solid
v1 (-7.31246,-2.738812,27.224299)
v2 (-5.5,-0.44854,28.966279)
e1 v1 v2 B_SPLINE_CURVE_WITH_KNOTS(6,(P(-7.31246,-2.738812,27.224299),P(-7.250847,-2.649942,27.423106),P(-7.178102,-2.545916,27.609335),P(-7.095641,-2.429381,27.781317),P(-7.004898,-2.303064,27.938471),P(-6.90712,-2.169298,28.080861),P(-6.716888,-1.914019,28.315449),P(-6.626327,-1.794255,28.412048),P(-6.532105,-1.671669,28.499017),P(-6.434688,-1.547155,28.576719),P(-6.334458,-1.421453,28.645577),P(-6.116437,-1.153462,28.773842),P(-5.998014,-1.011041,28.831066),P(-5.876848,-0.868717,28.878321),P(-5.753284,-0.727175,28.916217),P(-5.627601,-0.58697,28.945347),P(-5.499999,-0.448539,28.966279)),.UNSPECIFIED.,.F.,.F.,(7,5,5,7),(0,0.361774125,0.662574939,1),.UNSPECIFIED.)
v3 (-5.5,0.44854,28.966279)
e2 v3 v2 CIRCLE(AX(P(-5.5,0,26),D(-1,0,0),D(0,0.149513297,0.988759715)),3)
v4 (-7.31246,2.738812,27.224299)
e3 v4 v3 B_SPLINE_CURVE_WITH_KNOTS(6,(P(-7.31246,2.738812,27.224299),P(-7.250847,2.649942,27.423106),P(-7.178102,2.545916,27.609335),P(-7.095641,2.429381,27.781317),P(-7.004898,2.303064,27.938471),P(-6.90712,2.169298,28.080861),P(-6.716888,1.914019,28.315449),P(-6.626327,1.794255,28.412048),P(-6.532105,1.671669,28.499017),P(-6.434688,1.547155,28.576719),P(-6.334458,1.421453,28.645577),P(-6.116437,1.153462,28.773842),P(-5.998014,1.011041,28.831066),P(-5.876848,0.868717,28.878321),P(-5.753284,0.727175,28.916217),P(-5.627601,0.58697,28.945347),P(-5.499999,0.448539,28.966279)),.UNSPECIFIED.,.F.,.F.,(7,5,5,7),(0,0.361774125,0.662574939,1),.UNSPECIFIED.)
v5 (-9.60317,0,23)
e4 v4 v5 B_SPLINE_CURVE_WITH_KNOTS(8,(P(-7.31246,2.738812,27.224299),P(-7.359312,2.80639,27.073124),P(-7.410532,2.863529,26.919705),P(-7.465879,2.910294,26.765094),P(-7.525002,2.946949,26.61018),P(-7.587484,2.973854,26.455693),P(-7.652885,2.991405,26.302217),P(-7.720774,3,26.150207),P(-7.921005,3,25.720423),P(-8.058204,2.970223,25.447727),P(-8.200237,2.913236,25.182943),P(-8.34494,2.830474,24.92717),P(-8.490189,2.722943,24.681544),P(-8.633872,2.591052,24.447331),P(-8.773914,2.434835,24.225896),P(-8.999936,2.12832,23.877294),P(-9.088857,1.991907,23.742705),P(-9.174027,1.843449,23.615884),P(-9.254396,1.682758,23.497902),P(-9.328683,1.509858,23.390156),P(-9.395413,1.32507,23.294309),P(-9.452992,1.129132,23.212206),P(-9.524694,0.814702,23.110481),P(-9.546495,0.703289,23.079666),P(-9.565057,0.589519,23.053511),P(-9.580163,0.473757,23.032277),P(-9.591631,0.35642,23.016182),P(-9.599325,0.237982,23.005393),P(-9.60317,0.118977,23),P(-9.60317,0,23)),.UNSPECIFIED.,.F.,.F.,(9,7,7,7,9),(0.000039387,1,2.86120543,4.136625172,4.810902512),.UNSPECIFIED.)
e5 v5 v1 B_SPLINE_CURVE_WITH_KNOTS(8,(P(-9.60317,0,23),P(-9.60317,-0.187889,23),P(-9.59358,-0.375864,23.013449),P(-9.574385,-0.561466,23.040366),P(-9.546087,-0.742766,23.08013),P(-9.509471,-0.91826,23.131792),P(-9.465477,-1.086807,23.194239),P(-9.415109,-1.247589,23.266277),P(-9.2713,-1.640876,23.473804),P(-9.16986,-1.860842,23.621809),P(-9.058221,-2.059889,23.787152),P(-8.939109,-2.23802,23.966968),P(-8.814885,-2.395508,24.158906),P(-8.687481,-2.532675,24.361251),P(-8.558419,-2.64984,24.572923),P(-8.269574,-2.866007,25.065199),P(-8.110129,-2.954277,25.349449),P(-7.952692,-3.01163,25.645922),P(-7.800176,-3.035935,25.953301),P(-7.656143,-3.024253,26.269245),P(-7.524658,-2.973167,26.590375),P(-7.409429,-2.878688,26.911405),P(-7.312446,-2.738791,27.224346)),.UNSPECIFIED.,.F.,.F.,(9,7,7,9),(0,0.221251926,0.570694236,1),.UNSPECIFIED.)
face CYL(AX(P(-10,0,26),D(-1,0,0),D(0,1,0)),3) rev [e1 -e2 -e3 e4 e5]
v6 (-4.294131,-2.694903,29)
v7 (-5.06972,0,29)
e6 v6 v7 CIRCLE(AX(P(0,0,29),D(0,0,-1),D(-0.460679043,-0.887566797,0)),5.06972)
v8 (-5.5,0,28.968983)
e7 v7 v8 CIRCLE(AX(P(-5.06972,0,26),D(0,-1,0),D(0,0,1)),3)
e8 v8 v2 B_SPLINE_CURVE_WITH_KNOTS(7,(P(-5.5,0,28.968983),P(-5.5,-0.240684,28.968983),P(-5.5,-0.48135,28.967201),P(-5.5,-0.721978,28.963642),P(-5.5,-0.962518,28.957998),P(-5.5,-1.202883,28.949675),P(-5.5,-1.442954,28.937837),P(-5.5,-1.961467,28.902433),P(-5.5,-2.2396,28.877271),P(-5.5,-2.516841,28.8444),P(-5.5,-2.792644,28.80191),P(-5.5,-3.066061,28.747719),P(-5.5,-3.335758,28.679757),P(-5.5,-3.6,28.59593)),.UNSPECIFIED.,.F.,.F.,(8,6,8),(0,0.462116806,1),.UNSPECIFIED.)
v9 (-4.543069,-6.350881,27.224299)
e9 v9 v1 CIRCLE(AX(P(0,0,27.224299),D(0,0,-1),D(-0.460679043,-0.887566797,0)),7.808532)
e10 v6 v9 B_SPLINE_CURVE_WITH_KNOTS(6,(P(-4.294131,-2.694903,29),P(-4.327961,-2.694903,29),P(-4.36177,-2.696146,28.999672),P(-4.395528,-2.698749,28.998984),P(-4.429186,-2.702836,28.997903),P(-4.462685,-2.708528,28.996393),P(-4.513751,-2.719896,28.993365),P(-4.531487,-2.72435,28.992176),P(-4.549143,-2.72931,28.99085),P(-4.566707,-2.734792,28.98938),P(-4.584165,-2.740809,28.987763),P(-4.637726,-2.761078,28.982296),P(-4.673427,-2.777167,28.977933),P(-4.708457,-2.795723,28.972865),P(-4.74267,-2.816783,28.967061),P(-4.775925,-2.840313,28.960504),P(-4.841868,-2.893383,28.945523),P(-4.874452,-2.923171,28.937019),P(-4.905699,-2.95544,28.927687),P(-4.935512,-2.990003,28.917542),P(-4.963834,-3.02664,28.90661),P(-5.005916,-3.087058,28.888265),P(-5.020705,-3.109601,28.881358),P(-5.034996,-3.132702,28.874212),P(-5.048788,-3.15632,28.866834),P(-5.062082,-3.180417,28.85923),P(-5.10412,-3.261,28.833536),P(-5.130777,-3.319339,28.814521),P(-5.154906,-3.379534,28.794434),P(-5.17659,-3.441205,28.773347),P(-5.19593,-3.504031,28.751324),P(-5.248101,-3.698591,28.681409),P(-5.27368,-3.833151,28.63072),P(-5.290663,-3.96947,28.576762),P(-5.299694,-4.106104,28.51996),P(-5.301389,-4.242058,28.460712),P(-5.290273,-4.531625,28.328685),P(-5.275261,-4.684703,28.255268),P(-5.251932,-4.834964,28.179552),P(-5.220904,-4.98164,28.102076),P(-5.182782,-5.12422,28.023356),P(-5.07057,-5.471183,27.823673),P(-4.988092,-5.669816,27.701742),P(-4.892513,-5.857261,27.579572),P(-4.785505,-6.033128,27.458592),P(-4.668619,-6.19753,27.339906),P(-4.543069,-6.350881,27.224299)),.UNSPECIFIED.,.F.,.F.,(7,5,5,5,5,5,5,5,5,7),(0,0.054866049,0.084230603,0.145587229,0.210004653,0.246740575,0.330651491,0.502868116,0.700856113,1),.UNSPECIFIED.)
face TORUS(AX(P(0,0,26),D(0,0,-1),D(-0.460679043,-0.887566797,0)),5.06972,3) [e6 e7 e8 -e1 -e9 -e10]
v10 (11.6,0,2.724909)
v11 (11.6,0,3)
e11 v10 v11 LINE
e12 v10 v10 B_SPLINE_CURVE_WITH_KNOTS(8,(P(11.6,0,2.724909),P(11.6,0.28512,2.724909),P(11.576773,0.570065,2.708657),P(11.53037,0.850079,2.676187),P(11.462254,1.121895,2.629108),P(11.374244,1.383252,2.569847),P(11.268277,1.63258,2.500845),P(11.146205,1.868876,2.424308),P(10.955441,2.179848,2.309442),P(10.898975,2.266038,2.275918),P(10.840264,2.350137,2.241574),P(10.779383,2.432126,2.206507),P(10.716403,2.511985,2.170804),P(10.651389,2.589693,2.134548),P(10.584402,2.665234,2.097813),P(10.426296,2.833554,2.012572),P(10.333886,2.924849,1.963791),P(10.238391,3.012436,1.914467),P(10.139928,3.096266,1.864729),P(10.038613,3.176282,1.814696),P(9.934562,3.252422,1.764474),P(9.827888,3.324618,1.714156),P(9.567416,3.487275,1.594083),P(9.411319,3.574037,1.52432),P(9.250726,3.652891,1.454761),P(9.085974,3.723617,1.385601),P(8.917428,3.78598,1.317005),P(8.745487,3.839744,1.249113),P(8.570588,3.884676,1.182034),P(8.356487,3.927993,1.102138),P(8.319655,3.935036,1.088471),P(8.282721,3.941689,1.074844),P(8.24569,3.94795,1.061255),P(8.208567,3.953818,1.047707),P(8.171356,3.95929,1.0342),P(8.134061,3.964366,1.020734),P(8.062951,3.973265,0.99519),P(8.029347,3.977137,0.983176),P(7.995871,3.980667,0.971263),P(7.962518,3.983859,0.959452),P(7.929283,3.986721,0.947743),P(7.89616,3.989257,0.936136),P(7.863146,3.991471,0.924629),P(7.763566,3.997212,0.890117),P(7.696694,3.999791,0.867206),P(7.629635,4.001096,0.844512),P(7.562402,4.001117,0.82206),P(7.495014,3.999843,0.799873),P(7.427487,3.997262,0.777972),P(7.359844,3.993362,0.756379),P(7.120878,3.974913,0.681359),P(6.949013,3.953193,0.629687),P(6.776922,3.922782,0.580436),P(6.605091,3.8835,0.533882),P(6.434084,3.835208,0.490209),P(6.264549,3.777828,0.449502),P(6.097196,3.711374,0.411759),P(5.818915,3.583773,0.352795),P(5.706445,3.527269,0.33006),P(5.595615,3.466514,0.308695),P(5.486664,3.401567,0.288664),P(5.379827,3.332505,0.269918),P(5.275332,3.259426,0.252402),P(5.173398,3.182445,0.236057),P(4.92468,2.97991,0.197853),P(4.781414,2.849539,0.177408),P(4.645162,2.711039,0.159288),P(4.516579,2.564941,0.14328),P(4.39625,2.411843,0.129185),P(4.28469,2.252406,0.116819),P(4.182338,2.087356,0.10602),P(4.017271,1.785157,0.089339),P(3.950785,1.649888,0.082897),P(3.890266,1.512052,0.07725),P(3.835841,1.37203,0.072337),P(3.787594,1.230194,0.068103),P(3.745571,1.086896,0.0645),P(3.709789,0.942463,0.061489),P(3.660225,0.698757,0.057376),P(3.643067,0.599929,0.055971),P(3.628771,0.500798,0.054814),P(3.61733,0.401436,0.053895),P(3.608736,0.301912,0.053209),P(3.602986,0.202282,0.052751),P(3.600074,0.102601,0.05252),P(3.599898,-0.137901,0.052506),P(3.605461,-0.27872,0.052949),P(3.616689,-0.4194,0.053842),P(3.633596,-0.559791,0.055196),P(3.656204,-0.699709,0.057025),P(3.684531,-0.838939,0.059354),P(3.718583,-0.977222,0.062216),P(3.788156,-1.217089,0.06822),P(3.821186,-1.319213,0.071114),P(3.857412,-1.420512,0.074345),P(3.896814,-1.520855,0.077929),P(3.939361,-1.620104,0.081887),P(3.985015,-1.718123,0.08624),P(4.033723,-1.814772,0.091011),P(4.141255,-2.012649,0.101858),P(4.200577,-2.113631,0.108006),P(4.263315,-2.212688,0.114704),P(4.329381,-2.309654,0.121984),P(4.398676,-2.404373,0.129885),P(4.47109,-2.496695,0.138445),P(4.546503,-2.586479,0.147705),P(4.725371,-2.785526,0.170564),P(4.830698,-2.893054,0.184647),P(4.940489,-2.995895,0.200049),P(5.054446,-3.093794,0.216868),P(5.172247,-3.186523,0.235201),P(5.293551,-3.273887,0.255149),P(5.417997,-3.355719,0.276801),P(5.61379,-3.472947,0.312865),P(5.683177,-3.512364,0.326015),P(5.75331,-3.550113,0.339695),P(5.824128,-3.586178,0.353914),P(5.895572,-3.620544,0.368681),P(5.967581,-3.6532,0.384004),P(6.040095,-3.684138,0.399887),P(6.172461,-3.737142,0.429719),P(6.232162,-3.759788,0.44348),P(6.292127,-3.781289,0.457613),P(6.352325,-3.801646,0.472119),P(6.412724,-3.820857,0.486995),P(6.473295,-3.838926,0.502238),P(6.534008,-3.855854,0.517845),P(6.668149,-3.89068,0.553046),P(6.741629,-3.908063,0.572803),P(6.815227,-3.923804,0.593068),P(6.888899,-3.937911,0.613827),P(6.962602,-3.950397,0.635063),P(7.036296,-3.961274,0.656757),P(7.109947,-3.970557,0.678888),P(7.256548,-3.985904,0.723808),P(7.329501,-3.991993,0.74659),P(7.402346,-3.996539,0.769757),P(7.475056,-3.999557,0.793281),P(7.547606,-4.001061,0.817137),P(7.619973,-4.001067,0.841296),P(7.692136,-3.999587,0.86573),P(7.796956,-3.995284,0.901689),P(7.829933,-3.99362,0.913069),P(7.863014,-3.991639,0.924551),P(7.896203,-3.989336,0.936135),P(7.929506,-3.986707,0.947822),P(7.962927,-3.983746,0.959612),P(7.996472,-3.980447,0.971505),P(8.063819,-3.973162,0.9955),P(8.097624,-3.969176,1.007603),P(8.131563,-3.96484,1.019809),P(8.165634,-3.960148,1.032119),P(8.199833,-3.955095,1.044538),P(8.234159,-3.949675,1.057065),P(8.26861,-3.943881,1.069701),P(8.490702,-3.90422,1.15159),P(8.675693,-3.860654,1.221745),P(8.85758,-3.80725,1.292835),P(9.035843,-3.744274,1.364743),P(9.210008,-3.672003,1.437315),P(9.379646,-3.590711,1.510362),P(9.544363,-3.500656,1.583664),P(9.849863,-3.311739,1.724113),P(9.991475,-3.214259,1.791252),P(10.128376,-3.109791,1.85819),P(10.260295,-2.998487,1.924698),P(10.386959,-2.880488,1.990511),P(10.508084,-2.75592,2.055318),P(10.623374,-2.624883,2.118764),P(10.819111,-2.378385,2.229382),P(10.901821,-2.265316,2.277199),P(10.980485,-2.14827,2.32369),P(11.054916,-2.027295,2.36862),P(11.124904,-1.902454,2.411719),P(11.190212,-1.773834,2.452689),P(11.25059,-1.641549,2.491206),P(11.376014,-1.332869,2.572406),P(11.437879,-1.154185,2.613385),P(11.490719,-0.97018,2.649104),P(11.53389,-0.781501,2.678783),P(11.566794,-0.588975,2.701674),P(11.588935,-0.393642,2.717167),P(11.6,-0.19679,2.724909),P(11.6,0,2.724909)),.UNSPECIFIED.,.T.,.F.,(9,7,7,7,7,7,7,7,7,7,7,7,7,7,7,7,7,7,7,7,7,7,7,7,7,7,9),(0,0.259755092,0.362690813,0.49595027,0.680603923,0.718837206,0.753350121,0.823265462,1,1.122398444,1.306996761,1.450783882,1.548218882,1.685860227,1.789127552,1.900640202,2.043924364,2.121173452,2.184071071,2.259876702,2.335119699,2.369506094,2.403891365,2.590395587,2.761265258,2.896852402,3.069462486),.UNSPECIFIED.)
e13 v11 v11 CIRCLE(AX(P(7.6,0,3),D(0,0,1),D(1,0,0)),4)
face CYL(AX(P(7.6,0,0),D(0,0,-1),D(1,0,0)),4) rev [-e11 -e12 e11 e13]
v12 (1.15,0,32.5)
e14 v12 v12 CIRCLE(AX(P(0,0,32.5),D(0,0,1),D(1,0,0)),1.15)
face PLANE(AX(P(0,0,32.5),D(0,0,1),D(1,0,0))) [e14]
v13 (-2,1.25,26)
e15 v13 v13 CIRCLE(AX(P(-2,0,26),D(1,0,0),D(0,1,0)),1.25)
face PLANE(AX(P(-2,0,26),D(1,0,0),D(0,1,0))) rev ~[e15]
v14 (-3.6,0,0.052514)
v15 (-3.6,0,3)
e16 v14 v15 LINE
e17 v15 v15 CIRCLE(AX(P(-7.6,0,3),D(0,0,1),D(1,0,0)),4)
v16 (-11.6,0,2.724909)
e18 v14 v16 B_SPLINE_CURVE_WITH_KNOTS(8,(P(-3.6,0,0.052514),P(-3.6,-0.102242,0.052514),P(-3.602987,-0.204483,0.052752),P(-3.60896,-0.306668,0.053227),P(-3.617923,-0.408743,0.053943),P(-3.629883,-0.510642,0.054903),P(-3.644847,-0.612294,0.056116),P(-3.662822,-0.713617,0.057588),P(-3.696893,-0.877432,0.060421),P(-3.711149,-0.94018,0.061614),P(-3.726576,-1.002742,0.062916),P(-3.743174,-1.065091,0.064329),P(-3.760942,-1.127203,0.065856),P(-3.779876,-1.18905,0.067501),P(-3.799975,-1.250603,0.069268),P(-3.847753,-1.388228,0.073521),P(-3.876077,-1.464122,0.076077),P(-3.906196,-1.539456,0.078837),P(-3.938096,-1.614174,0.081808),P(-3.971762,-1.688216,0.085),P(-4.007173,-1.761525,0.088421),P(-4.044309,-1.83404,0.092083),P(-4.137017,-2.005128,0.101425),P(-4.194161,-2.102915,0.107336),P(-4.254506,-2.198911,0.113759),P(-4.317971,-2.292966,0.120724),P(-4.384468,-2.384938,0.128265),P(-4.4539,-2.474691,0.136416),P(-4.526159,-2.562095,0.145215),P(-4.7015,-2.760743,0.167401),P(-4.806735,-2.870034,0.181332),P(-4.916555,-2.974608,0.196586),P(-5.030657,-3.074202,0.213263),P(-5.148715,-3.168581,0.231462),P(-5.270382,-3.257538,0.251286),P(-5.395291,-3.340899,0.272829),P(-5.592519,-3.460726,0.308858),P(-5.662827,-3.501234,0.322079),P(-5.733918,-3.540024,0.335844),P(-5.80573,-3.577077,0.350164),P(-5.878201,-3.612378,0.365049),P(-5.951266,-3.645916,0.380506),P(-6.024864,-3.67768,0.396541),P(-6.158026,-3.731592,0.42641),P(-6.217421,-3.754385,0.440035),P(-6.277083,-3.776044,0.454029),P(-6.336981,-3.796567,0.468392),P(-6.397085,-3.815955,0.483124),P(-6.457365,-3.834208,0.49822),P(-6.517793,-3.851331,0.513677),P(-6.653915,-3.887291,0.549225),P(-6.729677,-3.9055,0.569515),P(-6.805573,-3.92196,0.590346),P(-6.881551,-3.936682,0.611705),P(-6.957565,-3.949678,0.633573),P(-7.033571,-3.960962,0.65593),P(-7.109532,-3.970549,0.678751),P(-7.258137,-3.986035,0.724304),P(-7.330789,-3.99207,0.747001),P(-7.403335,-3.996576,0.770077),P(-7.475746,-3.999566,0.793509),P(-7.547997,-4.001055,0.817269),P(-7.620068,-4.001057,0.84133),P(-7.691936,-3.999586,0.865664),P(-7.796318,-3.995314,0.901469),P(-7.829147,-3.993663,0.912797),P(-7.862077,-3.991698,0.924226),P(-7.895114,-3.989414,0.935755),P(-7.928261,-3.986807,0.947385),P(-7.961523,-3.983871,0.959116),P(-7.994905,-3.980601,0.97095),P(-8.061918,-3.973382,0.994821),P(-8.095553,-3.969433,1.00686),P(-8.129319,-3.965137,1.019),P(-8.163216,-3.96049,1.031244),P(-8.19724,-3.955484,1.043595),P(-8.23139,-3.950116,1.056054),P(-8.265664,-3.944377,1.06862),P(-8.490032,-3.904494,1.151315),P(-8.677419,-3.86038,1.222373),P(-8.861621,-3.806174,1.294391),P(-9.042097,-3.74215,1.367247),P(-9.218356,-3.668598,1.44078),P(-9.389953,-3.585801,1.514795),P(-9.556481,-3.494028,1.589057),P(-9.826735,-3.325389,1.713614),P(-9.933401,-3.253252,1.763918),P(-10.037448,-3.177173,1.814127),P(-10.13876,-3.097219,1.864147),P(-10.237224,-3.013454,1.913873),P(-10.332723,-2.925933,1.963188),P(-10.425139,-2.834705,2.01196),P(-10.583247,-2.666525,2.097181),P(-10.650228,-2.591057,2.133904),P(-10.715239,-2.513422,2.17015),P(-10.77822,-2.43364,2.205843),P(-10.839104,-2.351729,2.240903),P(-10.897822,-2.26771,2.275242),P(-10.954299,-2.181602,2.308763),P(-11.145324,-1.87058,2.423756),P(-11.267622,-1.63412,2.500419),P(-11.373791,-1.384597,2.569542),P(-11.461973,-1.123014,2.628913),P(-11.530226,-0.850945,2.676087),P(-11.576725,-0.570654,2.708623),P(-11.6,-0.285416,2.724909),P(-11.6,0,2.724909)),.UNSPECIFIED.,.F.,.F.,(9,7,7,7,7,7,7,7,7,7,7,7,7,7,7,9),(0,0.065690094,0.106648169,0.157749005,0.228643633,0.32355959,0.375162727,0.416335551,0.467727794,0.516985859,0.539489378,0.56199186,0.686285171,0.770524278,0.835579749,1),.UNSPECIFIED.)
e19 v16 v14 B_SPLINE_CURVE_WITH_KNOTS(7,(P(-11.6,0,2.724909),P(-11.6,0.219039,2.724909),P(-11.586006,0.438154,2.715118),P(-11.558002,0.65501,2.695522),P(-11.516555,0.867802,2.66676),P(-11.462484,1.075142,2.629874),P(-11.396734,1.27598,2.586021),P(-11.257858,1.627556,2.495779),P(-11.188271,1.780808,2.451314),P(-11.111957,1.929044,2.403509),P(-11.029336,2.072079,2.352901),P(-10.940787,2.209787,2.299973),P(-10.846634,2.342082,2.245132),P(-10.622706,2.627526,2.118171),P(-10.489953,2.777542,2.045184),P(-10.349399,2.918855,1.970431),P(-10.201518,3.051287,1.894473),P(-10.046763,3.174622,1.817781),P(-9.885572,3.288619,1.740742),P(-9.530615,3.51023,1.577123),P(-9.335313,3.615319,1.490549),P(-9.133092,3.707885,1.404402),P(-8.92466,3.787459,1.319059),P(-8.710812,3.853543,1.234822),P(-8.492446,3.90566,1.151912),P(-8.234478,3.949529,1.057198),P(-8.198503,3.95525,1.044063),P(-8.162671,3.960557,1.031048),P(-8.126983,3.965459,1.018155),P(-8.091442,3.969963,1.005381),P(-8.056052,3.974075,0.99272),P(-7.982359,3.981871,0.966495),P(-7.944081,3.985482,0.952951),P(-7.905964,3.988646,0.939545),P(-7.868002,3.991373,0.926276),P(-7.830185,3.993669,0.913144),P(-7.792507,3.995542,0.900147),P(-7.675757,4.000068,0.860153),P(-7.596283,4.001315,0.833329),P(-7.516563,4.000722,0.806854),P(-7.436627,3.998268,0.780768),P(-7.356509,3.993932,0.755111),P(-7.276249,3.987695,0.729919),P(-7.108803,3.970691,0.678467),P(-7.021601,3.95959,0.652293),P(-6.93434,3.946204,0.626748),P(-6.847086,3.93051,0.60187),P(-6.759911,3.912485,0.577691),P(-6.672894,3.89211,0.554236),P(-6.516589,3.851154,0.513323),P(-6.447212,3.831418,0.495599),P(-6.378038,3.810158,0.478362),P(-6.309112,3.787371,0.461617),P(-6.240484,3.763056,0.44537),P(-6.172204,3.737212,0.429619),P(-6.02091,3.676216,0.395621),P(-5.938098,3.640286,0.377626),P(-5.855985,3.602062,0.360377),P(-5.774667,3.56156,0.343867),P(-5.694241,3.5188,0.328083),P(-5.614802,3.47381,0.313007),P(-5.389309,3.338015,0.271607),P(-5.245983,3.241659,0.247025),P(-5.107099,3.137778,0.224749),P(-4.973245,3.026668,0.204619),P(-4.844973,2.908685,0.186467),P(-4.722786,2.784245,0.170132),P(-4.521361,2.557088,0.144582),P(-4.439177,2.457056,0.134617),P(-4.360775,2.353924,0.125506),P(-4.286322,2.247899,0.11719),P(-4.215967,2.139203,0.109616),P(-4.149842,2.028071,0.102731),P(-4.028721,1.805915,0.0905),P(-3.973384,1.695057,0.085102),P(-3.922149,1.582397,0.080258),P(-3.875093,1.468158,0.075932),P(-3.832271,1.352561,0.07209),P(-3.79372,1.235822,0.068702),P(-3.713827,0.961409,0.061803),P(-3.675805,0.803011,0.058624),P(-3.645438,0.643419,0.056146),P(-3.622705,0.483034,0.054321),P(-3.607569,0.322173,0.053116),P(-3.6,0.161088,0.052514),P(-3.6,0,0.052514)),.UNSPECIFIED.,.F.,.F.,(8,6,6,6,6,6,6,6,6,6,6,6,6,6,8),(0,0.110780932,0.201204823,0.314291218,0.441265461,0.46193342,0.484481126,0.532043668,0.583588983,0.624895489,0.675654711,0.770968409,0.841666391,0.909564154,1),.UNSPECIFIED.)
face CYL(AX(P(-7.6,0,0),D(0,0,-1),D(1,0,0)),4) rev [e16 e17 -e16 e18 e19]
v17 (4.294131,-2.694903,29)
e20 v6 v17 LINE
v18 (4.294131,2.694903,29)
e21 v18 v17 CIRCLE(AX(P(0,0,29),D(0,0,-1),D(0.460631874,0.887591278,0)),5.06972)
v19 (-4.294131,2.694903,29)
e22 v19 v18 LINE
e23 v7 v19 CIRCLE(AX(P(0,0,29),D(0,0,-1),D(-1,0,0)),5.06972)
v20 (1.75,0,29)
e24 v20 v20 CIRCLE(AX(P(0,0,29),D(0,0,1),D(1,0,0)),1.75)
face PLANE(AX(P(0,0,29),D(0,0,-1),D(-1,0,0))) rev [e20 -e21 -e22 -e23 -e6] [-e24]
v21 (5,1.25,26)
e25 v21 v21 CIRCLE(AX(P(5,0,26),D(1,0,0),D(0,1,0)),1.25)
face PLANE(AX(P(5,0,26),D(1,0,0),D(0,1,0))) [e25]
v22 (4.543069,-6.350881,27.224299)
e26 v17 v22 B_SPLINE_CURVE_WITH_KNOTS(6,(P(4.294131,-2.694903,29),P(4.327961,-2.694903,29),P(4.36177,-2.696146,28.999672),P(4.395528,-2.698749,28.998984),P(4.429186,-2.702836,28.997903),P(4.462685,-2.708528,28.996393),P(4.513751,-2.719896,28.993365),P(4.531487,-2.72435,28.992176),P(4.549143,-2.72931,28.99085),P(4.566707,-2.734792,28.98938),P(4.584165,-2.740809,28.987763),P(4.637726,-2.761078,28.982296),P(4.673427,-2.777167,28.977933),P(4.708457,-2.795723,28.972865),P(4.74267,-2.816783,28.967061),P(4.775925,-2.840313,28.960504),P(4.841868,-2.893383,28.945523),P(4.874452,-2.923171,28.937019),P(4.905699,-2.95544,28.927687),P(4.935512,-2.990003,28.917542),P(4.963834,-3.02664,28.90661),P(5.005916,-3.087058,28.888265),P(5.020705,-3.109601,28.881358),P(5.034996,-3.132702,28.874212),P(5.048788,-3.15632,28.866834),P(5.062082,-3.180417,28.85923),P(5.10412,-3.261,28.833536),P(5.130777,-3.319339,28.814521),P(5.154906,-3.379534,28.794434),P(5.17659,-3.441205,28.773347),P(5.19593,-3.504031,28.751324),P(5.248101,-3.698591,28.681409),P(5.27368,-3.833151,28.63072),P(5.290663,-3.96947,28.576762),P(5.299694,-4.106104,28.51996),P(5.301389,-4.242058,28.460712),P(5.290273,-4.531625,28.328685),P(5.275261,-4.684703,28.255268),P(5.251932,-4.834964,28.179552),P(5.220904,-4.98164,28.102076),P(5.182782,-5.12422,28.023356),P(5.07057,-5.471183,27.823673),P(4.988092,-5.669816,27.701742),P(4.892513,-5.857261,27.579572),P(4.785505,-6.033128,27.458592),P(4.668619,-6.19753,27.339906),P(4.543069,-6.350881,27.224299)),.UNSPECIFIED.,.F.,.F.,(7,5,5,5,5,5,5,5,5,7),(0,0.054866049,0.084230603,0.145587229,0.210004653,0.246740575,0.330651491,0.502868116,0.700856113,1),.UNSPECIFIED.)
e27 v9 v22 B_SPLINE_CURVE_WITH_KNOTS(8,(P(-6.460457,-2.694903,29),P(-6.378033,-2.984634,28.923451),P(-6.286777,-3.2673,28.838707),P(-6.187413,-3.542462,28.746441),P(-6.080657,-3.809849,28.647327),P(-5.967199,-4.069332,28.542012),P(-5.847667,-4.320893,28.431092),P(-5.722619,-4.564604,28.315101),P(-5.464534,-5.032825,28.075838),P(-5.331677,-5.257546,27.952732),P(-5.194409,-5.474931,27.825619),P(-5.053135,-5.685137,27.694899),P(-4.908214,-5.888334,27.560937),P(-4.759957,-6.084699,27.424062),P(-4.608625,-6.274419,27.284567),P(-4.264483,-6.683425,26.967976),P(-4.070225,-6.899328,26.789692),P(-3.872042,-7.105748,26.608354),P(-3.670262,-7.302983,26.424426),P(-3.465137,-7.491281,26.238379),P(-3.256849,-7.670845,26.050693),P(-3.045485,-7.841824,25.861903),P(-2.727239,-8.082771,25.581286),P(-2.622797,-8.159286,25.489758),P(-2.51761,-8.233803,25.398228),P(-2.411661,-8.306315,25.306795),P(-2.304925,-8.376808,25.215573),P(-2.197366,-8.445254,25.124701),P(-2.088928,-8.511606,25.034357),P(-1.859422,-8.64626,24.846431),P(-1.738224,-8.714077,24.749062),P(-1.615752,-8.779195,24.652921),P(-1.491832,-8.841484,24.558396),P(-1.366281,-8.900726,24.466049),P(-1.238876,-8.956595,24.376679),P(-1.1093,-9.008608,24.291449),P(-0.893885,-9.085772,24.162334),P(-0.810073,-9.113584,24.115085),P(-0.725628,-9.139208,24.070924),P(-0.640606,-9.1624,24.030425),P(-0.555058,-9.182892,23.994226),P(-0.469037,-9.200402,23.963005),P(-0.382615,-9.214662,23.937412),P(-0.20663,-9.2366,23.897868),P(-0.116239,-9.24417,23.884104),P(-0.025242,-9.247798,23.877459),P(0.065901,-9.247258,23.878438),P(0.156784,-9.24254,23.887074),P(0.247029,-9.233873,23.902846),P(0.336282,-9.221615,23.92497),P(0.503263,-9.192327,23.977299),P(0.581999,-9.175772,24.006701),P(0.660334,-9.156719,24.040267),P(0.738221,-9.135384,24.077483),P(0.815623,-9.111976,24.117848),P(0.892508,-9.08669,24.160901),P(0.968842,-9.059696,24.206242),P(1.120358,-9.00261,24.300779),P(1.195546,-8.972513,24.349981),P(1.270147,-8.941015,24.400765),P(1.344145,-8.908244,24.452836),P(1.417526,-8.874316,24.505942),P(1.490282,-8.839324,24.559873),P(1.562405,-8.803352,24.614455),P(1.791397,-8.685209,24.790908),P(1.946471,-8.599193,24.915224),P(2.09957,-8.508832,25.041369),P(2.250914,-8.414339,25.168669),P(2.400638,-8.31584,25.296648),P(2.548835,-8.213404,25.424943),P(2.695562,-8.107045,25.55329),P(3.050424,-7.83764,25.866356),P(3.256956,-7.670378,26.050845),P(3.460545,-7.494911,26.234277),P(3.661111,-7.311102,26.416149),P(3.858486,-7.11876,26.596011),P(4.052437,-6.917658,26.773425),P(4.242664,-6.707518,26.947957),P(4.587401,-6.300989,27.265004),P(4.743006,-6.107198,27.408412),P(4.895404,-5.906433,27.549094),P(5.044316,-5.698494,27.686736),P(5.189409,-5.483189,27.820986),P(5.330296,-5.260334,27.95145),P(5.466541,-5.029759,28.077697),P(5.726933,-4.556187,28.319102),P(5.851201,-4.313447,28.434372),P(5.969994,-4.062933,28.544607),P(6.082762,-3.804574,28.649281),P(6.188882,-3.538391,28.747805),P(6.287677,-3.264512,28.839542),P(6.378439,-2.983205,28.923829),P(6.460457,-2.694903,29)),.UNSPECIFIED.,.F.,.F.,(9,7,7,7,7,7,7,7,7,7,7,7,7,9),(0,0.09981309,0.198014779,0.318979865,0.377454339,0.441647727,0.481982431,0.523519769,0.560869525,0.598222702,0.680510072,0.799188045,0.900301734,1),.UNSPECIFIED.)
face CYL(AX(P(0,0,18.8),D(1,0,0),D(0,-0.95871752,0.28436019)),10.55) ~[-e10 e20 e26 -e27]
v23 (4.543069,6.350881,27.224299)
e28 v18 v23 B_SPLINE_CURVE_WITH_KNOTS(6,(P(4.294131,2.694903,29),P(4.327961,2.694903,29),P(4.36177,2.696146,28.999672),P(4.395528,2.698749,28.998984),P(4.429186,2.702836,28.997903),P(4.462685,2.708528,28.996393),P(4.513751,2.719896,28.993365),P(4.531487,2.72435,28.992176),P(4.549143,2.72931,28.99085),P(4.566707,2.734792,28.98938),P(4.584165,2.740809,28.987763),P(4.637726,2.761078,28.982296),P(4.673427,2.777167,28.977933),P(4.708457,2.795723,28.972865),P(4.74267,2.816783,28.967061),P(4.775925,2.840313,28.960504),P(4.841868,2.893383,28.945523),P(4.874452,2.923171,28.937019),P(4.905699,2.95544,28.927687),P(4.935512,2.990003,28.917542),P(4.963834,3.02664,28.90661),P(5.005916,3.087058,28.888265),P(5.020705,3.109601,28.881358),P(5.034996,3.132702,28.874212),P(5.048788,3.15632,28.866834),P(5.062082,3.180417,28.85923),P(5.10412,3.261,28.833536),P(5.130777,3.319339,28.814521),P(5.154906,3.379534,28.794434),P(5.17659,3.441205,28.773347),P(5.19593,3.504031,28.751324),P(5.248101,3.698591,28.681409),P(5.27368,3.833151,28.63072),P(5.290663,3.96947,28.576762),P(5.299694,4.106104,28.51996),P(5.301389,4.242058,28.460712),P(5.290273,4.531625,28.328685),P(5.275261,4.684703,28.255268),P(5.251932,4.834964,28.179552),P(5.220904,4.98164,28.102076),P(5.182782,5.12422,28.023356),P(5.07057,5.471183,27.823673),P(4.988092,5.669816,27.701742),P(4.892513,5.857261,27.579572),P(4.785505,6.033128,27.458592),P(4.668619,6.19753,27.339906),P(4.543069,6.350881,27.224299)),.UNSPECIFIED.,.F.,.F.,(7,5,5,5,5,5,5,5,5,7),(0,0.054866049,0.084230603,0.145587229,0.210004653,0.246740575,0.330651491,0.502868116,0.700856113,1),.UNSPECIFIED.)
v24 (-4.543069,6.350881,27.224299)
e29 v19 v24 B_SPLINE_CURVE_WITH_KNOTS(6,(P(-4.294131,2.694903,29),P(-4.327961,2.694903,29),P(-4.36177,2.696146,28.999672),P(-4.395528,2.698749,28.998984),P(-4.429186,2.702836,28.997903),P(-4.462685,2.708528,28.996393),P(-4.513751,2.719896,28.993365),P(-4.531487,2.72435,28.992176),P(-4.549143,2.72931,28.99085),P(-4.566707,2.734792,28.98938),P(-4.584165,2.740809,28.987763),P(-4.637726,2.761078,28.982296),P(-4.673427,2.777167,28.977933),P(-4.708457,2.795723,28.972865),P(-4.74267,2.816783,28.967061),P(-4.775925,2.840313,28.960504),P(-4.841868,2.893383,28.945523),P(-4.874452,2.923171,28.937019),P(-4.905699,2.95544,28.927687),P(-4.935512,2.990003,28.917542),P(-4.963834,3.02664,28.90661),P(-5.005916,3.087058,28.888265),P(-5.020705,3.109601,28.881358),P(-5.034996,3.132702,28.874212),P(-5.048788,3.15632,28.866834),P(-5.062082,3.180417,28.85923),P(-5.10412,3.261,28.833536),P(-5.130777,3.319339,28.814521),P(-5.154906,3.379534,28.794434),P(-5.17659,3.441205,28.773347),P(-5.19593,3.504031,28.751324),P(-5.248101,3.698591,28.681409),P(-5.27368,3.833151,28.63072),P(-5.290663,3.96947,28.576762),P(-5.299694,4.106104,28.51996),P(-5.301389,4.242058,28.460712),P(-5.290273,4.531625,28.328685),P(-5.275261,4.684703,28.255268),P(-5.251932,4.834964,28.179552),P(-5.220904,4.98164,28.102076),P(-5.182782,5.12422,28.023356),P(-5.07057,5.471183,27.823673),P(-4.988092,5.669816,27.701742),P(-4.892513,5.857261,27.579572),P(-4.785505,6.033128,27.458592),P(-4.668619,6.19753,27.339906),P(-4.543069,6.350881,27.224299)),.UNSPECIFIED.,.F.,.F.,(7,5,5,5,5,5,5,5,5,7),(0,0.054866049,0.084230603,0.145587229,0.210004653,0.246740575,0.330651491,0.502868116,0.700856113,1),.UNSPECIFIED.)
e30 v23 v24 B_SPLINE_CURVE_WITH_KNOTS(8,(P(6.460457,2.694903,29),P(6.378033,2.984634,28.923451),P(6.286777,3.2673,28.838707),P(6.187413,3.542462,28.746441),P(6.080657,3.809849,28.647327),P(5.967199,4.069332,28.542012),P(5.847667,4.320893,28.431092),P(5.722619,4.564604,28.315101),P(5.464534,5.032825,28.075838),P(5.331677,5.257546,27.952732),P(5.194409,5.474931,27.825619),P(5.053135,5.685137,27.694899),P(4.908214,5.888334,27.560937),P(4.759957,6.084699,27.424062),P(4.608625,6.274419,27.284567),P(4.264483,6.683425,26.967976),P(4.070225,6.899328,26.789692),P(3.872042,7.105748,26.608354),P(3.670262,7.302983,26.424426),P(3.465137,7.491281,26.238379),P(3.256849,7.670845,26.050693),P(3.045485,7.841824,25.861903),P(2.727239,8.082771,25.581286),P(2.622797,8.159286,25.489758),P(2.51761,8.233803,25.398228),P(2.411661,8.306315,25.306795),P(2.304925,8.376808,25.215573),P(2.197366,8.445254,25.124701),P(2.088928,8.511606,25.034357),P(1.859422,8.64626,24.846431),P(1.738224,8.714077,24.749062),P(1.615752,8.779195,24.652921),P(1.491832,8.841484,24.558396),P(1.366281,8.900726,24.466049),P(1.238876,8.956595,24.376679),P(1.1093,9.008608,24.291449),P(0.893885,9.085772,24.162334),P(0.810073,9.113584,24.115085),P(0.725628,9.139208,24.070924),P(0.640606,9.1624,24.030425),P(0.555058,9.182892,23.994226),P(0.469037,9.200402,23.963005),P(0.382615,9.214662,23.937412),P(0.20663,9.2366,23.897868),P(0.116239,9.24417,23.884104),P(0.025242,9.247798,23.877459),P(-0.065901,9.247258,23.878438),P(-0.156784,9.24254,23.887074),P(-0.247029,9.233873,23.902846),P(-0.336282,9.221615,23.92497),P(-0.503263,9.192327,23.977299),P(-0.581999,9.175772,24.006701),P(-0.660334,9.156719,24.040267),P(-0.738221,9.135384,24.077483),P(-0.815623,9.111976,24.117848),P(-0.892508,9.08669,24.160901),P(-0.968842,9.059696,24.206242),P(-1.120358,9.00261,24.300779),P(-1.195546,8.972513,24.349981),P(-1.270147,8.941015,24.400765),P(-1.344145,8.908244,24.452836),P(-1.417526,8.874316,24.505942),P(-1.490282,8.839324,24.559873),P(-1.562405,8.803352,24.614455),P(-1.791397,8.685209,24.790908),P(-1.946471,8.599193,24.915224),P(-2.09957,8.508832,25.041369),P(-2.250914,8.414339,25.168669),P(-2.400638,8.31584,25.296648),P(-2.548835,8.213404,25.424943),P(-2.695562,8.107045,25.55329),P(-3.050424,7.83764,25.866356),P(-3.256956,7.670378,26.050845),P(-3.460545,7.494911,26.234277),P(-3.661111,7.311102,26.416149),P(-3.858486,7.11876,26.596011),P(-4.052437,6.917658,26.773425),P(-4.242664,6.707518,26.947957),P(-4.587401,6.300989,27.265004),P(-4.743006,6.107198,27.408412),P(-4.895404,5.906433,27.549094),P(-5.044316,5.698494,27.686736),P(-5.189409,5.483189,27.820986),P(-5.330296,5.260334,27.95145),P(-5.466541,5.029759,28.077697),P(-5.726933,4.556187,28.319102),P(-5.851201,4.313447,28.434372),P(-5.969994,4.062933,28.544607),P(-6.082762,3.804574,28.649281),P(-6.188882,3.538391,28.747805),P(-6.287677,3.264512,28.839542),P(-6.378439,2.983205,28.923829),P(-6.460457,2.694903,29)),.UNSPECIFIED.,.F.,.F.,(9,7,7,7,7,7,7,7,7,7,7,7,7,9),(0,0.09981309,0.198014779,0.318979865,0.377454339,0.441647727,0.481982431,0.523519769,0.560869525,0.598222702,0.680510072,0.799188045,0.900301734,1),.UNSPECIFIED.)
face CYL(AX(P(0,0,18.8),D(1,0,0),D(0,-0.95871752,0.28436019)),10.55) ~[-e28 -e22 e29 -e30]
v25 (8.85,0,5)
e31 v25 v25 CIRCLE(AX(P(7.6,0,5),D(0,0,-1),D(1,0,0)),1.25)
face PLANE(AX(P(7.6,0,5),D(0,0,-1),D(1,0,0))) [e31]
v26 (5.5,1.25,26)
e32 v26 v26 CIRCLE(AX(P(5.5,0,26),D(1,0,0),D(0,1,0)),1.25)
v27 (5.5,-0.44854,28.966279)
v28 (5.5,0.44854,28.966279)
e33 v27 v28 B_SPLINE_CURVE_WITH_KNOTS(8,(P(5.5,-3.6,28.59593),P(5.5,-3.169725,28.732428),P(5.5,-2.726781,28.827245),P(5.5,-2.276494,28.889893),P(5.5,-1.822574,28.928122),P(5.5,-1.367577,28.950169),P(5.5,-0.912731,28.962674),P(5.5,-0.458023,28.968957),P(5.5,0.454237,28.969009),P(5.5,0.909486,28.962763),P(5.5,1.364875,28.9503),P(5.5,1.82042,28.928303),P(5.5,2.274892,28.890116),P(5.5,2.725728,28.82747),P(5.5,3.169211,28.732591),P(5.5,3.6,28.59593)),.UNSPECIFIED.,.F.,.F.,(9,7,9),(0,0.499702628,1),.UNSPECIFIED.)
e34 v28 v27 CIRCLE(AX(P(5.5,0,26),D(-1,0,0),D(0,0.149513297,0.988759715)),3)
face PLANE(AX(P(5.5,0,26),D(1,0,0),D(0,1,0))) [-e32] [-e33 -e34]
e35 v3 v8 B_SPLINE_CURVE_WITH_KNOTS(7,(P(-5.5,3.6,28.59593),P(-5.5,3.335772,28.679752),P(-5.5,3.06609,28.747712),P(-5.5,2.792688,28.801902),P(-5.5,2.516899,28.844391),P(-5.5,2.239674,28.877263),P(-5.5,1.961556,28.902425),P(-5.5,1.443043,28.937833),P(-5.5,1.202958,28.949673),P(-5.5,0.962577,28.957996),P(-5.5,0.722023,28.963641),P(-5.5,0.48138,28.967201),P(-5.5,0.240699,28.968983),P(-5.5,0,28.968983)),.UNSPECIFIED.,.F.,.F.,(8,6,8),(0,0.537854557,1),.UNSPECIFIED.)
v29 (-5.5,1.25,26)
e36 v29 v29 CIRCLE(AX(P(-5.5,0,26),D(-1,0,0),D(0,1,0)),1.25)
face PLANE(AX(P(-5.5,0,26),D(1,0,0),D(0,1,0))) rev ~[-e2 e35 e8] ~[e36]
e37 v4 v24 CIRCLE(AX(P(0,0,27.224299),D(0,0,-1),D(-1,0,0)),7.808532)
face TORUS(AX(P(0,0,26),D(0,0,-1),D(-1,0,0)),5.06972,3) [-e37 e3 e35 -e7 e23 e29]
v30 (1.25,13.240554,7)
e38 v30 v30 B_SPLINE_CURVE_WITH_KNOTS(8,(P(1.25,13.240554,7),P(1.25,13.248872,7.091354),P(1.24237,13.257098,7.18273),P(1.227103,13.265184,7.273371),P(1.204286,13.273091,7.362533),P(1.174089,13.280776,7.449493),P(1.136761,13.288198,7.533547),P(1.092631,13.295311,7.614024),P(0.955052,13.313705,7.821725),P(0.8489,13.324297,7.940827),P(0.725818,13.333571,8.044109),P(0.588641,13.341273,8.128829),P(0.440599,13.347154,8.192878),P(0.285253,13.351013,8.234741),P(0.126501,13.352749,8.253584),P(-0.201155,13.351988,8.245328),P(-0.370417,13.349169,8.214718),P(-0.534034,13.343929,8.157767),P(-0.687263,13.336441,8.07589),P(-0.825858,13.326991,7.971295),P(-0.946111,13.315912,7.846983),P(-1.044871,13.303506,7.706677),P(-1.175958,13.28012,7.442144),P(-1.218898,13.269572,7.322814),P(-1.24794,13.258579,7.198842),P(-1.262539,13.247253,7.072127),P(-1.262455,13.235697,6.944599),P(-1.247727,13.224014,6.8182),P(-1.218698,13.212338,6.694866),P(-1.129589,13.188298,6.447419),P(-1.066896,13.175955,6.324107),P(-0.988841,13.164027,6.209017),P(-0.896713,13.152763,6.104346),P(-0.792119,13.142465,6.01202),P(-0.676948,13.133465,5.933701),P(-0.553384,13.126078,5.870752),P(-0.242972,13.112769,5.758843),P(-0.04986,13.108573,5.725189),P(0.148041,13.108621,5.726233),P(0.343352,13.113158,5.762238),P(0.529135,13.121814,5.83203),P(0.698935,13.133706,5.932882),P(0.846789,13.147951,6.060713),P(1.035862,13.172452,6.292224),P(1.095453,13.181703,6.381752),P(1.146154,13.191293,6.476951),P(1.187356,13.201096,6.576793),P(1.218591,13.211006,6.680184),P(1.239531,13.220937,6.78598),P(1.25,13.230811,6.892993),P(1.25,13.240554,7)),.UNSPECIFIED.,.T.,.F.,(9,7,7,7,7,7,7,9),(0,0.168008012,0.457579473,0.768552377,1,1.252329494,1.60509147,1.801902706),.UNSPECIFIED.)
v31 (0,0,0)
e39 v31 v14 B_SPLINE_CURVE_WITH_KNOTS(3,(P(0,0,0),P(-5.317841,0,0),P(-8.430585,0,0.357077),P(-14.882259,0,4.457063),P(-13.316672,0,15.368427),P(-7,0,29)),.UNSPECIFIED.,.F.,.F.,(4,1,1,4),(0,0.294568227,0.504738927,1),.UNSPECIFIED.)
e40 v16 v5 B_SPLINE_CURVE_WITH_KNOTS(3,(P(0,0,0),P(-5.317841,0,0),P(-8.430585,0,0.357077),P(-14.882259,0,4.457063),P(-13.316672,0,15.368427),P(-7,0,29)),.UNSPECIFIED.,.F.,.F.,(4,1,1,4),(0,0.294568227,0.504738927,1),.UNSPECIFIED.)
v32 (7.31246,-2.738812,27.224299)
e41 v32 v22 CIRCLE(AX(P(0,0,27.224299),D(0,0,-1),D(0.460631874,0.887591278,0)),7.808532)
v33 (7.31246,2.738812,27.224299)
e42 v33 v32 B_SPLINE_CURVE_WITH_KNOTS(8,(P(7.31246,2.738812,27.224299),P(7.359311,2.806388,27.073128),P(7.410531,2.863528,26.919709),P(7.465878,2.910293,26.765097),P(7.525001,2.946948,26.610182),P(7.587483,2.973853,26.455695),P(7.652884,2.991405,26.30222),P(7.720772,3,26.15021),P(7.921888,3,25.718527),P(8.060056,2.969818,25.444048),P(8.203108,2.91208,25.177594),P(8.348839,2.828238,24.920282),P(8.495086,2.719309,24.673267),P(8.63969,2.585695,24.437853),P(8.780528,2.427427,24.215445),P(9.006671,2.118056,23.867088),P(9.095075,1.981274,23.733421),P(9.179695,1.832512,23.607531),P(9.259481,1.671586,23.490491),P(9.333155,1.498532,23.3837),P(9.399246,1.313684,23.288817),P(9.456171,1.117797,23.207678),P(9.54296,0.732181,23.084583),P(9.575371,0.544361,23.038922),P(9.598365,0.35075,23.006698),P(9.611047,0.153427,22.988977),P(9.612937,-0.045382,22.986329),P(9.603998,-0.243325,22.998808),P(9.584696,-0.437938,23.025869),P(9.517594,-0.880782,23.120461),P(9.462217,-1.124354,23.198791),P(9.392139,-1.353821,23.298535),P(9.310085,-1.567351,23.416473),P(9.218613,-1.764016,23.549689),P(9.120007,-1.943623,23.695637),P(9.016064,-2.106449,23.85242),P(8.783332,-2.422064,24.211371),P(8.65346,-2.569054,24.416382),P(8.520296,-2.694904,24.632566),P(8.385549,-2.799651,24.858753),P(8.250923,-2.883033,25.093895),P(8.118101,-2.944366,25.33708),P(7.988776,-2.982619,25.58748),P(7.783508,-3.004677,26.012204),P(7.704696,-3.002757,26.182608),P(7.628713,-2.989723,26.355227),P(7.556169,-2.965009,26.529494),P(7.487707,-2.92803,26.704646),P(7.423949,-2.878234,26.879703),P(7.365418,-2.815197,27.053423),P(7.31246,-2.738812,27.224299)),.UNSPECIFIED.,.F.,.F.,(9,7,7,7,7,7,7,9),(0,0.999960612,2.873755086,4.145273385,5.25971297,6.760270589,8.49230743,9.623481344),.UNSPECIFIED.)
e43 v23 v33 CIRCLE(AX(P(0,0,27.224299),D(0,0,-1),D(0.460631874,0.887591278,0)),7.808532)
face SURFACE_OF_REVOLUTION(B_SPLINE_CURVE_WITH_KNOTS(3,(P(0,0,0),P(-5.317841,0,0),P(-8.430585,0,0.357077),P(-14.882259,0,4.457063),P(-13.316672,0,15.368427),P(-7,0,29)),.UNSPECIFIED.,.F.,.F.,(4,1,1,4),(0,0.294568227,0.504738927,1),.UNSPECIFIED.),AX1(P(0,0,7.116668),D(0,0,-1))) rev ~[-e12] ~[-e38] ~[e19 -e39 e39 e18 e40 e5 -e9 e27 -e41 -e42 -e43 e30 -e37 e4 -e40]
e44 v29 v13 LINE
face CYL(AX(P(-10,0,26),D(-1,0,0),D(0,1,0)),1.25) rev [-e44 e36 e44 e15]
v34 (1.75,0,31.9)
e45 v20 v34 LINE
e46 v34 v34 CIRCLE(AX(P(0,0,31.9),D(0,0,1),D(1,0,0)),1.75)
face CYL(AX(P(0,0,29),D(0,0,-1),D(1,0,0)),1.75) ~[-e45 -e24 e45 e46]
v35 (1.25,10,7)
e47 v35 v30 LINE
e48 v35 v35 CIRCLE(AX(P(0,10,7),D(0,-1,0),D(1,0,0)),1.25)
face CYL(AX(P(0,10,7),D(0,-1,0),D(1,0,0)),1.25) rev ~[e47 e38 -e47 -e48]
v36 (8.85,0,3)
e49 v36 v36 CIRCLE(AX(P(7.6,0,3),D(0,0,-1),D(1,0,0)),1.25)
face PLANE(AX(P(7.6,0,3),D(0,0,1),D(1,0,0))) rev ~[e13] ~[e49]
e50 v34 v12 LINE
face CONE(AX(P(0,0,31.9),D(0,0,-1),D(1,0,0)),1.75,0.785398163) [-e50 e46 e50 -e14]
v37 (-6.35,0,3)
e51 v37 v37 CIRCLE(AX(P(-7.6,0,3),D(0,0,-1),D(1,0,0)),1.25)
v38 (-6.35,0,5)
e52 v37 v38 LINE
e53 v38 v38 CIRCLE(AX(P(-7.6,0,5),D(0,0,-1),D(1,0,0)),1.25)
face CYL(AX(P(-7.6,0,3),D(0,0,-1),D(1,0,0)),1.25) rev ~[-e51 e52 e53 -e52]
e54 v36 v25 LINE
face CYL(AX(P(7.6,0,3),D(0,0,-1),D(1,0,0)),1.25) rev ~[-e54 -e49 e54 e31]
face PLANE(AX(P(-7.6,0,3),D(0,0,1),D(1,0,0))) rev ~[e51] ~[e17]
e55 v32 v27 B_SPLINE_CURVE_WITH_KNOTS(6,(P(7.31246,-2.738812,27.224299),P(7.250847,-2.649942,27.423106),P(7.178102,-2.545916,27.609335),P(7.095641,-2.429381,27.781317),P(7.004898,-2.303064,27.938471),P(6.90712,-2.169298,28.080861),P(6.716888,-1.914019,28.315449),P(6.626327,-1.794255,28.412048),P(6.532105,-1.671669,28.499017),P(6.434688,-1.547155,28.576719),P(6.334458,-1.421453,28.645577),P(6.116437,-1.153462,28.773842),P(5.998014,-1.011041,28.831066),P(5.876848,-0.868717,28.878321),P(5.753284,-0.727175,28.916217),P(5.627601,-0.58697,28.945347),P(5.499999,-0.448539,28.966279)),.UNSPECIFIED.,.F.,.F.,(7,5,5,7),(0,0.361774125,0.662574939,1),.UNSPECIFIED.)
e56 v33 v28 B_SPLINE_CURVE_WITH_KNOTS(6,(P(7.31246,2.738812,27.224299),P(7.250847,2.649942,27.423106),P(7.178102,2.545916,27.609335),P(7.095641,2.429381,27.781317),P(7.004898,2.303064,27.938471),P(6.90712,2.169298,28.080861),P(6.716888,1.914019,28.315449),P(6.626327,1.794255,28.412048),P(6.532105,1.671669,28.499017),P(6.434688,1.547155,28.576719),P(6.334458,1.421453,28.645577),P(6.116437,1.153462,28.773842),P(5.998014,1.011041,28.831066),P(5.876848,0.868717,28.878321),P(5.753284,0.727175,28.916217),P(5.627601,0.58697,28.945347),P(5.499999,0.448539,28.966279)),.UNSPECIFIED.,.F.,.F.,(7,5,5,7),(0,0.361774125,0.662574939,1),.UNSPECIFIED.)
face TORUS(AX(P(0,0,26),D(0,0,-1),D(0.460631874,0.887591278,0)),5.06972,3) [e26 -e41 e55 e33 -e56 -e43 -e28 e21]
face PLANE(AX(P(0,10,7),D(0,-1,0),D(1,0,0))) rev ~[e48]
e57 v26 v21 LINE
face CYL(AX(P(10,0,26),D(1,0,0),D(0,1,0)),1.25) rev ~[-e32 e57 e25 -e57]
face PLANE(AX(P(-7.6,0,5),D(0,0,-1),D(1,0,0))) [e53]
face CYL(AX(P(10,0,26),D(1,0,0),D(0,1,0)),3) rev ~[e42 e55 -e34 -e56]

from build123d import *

# Parameters (mm, degrees)
F3_R          = 4
F4_DEPTH      = 3
F5_R          = 1.25
F6_DEPTH      = 2
F7_R          = 1.25
F8_DEPTH      = 2
F10_DEPTH     = 12.5
F11_T4_ANGLE  = 62.5690664244
F11_S5_R      = 10.55
F11_T6_DEPTH  = 7
F11_T10_ANGLE = 125.1442226545
F11_S11_R     = 10.55
F11_T12_DEPTH = 10
F11_T16_ANGLE = 62.5690664244
F11_S17_R     = 10.55
F11_T18_DEPTH = 7
F12_R         = 1.75
F13_DEPTH     = 3.5
F14_SIZE      = 0.6
F15_R         = 1.25
F16_DEPTH     = 3.3534363587
F19_R         = 1.25
F20_DEPTH     = 5
F21_R         = 3
F22_DEPTH     = 4.5
F23_R         = 1.25
F24_DEPTH     = 8
F25_R         = 3
F26_DEPTH     = 4.5


# Not quite as in the source:
# - a fillet or chamfer that OpenCascade refuses, or shapes differently, is made with other operations: its cross-section is extruded or revolved along the edge and cut away or added


with BuildPart() as f2:
    # F1 (on Front) → F2 (revolve)
    with BuildSketch(Plane.XZ):
        with BuildLine():
            Line((0, 29), (-7, 29))
            add(Edge.make_bspline(
                [(0, 0), (-5.317841365, 0), (-8.4305850004, 0.3570766518), (-14.8822587004, 4.4570633142), (-13.316672088, 15.36842657), (-7, 29)],
                knots=[0, 0, 0, 0, 0.2945682266, 0.5047389267, 1, 1, 1, 1], degree=3))
            Line((0, 0), (0, 29))
        make_face()
    revolve(axis=Axis((0, 0, 7.1166679263), (0, 0, -1)))

    # F3 (on Top) → F4 (cut)
    with BuildSketch(Plane.XY):
        with Locations((-7.6, 0)):
            Circle(F3_R)
        with Locations((7.6, 0)):
            Circle(F3_R)
    extrude(amount=F4_DEPTH, mode=Mode.SUBTRACT)

    # F5 (on face) → F6 (cut)
    with BuildSketch(Plane(origin=(0, 0, 3), x_dir=(1, 0, 0), z_dir=(0, 0, -1))):
        with Locations((7.6, 0)):
            Circle(F5_R)
    extrude(amount=-F6_DEPTH, mode=Mode.SUBTRACT)

    # F7 (on face) → F8 (cut)
    with BuildSketch(Plane(origin=(0, 0, 3), x_dir=(1, 0, 0), z_dir=(0, 0, -1))):
        with Locations((-7.6, 0)):
            Circle(F7_R)
    extrude(amount=-F8_DEPTH, mode=Mode.SUBTRACT)

    # F9 (on Right) → F10 (cut, symmetric)
    with BuildSketch(Plane.YZ):
        with BuildLine():
            Line((-10.1144698329, 31.8), (-10.1144698329, 21.8))
            ThreePointArc((-10.1144698329, 21.8), (0, 29.35), (10.1144698329, 21.8))
            Line((10.1144698329, 21.8), (10.1144698329, 31.8))
            Line((10.1144698329, 31.8), (-10.1144698329, 31.8))
        make_face()
    extrude(amount=F10_DEPTH, both=True, mode=Mode.SUBTRACT)

    # F11: fillet of radius 3 on 3 edges, made by hand


with BuildPart() as f11_tool2:
    # F11_s3 → F11_t4 (revolve)
    with BuildSketch(Plane.XZ):
        with BuildLine():
            ThreePointArc((-5.0697196206, 29), (-6.7017587776, 28.5172302616), (-7.8085318567, 27.2242987933))
            Line((-7.8085318567, 27.2242987933), (-7.8633081014, 27.2487847692))
            ThreePointArc((-7.8633081014, 27.2487847692), (-7.4618780859, 28.1383864481), (-7.0544392435, 29.0252263506))
            Line((-7.0544392435, 29.0252263506), (-7, 29.06))
            Line((-7, 29.06), (-5.0697196206, 29.06))
            Line((-5.0697196206, 29.06), (-5.0697196206, 29))
        make_face()
    revolve(axis=Axis((0, 0, 29), (0, 0, -1)), revolution_arc=F11_T4_ANGLE)

    # F11_s5 → F11_t6 (intersect, symmetric)
    with BuildSketch(Plane.YZ.offset(-5.5)):
        with Locations((0, 18.8)):
            Circle(F11_S5_R)
    extrude(amount=F11_T6_DEPTH, both=True, mode=Mode.INTERSECT)


with BuildPart() as f2_1:
    add(f2.part)

    # F11_t1: cut F11_tool2
    add(f11_tool2.part, mode=Mode.SUBTRACT)


with BuildPart() as f11_tool8:
    # F11_s9 → F11_t10 (revolve)
    with BuildSketch(Plane(origin=(0, 0, 0), x_dir=(0, 0, 1), z_dir=(-0.8875912781, 0.4606318736, 0))):
        with BuildLine():
            ThreePointArc((29, 5.0697196206), (28.5172302616, 6.7017587776), (27.2242987933, 7.8085318567))
            Line((27.2242987933, 7.8085318567), (27.2487847692, 7.8633081014))
            ThreePointArc((27.2487847692, 7.8633081014), (28.1383864481, 7.4618780859), (29.0252263506, 7.0544392435))
            Line((29.0252263506, 7.0544392435), (29.06, 7))
            Line((29.06, 7), (29.06, 5.0697196206))
            Line((29.06, 5.0697196206), (29, 5.0697196206))
        make_face()
    revolve(axis=Axis((0, 0, 29), (0, 0, -1)), revolution_arc=F11_T10_ANGLE)

    # F11_s11 → F11_t12 (intersect, symmetric)
    with BuildSketch(Plane.YZ.offset(5.3)):
        with Locations((0, 18.8)):
            Circle(F11_S11_R)
    extrude(amount=F11_T12_DEPTH, both=True, mode=Mode.INTERSECT)


with BuildPart() as f2_2:
    add(f2_1.part)

    # F11_t7: cut F11_tool8
    add(f11_tool8.part, mode=Mode.SUBTRACT)


with BuildPart() as f11_tool14:
    # F11_s15 → F11_t16 (revolve)
    with BuildSketch(Plane(origin=(0, 0, 0), x_dir=(0, 0, 1), z_dir=(0.8875667972, -0.4606790428, 0))):
        with BuildLine():
            ThreePointArc((29, 5.0697196206), (28.5172302616, 6.7017587776), (27.2242987933, 7.8085318567))
            Line((27.2242987933, 7.8085318567), (27.2487847692, 7.8633081014))
            ThreePointArc((27.2487847692, 7.8633081014), (28.1383864481, 7.4618780859), (29.0252263506, 7.0544392435))
            Line((29.0252263506, 7.0544392435), (29.06, 7))
            Line((29.06, 7), (29.06, 5.0697196206))
            Line((29.06, 5.0697196206), (29, 5.0697196206))
        make_face()
    revolve(axis=Axis((0, 0, 29), (0, 0, -1)), revolution_arc=F11_T16_ANGLE)

    # F11_s17 → F11_t18 (intersect, symmetric)
    with BuildSketch(Plane.YZ.offset(-5.5)):
        with Locations((0, 18.8)):
            Circle(F11_S17_R)
    extrude(amount=F11_T18_DEPTH, both=True, mode=Mode.INTERSECT)


with BuildPart() as f2_3:
    add(f2_2.part)

    # F11_t13: cut F11_tool14
    add(f11_tool14.part, mode=Mode.SUBTRACT)

    # F12 (on face) → F13 (join)
    with BuildSketch(Plane.XY.offset(29)):
        Circle(F12_R)
    extrude(amount=F13_DEPTH)

    # F14
    f14_edges = [f2_3.edges().sort_by_distance(p)[0] for p in [
        (-1.75, 0, 32.5),
    ]]
    chamfer(f14_edges, length=F14_SIZE)

    # F15 (on offset) → F16 (cut, through all)
    with BuildSketch(Plane.XZ.offset(-10)):
        with Locations((0, 7)):
            Circle(F15_R)
    extrude(amount=-F16_DEPTH, mode=Mode.SUBTRACT)

    # F19 (on offset) → F20 (cut)
    with BuildSketch(Plane.YZ.offset(10)):
        with Locations((0, 26)):
            Circle(F19_R)
    extrude(amount=-F20_DEPTH, mode=Mode.SUBTRACT)

    # F21 (on offset) → F22 (cut)
    with BuildSketch(Plane.YZ.offset(10)):
        with Locations((0, 26)):
            Circle(F21_R)
    extrude(amount=-F22_DEPTH, mode=Mode.SUBTRACT)

    # F23 (on offset) → F24 (cut)
    with BuildSketch(Plane.YZ.offset(-10)):
        with Locations((0, 26)):
            Circle(F23_R)
    extrude(amount=F24_DEPTH, mode=Mode.SUBTRACT)

    # F25 (on offset) → F26 (cut)
    with BuildSketch(Plane.YZ.offset(-10)):
        with Locations((0, 26)):
            Circle(F25_R)
    extrude(amount=F26_DEPTH, mode=Mode.SUBTRACT)


solid = f2_3.part
